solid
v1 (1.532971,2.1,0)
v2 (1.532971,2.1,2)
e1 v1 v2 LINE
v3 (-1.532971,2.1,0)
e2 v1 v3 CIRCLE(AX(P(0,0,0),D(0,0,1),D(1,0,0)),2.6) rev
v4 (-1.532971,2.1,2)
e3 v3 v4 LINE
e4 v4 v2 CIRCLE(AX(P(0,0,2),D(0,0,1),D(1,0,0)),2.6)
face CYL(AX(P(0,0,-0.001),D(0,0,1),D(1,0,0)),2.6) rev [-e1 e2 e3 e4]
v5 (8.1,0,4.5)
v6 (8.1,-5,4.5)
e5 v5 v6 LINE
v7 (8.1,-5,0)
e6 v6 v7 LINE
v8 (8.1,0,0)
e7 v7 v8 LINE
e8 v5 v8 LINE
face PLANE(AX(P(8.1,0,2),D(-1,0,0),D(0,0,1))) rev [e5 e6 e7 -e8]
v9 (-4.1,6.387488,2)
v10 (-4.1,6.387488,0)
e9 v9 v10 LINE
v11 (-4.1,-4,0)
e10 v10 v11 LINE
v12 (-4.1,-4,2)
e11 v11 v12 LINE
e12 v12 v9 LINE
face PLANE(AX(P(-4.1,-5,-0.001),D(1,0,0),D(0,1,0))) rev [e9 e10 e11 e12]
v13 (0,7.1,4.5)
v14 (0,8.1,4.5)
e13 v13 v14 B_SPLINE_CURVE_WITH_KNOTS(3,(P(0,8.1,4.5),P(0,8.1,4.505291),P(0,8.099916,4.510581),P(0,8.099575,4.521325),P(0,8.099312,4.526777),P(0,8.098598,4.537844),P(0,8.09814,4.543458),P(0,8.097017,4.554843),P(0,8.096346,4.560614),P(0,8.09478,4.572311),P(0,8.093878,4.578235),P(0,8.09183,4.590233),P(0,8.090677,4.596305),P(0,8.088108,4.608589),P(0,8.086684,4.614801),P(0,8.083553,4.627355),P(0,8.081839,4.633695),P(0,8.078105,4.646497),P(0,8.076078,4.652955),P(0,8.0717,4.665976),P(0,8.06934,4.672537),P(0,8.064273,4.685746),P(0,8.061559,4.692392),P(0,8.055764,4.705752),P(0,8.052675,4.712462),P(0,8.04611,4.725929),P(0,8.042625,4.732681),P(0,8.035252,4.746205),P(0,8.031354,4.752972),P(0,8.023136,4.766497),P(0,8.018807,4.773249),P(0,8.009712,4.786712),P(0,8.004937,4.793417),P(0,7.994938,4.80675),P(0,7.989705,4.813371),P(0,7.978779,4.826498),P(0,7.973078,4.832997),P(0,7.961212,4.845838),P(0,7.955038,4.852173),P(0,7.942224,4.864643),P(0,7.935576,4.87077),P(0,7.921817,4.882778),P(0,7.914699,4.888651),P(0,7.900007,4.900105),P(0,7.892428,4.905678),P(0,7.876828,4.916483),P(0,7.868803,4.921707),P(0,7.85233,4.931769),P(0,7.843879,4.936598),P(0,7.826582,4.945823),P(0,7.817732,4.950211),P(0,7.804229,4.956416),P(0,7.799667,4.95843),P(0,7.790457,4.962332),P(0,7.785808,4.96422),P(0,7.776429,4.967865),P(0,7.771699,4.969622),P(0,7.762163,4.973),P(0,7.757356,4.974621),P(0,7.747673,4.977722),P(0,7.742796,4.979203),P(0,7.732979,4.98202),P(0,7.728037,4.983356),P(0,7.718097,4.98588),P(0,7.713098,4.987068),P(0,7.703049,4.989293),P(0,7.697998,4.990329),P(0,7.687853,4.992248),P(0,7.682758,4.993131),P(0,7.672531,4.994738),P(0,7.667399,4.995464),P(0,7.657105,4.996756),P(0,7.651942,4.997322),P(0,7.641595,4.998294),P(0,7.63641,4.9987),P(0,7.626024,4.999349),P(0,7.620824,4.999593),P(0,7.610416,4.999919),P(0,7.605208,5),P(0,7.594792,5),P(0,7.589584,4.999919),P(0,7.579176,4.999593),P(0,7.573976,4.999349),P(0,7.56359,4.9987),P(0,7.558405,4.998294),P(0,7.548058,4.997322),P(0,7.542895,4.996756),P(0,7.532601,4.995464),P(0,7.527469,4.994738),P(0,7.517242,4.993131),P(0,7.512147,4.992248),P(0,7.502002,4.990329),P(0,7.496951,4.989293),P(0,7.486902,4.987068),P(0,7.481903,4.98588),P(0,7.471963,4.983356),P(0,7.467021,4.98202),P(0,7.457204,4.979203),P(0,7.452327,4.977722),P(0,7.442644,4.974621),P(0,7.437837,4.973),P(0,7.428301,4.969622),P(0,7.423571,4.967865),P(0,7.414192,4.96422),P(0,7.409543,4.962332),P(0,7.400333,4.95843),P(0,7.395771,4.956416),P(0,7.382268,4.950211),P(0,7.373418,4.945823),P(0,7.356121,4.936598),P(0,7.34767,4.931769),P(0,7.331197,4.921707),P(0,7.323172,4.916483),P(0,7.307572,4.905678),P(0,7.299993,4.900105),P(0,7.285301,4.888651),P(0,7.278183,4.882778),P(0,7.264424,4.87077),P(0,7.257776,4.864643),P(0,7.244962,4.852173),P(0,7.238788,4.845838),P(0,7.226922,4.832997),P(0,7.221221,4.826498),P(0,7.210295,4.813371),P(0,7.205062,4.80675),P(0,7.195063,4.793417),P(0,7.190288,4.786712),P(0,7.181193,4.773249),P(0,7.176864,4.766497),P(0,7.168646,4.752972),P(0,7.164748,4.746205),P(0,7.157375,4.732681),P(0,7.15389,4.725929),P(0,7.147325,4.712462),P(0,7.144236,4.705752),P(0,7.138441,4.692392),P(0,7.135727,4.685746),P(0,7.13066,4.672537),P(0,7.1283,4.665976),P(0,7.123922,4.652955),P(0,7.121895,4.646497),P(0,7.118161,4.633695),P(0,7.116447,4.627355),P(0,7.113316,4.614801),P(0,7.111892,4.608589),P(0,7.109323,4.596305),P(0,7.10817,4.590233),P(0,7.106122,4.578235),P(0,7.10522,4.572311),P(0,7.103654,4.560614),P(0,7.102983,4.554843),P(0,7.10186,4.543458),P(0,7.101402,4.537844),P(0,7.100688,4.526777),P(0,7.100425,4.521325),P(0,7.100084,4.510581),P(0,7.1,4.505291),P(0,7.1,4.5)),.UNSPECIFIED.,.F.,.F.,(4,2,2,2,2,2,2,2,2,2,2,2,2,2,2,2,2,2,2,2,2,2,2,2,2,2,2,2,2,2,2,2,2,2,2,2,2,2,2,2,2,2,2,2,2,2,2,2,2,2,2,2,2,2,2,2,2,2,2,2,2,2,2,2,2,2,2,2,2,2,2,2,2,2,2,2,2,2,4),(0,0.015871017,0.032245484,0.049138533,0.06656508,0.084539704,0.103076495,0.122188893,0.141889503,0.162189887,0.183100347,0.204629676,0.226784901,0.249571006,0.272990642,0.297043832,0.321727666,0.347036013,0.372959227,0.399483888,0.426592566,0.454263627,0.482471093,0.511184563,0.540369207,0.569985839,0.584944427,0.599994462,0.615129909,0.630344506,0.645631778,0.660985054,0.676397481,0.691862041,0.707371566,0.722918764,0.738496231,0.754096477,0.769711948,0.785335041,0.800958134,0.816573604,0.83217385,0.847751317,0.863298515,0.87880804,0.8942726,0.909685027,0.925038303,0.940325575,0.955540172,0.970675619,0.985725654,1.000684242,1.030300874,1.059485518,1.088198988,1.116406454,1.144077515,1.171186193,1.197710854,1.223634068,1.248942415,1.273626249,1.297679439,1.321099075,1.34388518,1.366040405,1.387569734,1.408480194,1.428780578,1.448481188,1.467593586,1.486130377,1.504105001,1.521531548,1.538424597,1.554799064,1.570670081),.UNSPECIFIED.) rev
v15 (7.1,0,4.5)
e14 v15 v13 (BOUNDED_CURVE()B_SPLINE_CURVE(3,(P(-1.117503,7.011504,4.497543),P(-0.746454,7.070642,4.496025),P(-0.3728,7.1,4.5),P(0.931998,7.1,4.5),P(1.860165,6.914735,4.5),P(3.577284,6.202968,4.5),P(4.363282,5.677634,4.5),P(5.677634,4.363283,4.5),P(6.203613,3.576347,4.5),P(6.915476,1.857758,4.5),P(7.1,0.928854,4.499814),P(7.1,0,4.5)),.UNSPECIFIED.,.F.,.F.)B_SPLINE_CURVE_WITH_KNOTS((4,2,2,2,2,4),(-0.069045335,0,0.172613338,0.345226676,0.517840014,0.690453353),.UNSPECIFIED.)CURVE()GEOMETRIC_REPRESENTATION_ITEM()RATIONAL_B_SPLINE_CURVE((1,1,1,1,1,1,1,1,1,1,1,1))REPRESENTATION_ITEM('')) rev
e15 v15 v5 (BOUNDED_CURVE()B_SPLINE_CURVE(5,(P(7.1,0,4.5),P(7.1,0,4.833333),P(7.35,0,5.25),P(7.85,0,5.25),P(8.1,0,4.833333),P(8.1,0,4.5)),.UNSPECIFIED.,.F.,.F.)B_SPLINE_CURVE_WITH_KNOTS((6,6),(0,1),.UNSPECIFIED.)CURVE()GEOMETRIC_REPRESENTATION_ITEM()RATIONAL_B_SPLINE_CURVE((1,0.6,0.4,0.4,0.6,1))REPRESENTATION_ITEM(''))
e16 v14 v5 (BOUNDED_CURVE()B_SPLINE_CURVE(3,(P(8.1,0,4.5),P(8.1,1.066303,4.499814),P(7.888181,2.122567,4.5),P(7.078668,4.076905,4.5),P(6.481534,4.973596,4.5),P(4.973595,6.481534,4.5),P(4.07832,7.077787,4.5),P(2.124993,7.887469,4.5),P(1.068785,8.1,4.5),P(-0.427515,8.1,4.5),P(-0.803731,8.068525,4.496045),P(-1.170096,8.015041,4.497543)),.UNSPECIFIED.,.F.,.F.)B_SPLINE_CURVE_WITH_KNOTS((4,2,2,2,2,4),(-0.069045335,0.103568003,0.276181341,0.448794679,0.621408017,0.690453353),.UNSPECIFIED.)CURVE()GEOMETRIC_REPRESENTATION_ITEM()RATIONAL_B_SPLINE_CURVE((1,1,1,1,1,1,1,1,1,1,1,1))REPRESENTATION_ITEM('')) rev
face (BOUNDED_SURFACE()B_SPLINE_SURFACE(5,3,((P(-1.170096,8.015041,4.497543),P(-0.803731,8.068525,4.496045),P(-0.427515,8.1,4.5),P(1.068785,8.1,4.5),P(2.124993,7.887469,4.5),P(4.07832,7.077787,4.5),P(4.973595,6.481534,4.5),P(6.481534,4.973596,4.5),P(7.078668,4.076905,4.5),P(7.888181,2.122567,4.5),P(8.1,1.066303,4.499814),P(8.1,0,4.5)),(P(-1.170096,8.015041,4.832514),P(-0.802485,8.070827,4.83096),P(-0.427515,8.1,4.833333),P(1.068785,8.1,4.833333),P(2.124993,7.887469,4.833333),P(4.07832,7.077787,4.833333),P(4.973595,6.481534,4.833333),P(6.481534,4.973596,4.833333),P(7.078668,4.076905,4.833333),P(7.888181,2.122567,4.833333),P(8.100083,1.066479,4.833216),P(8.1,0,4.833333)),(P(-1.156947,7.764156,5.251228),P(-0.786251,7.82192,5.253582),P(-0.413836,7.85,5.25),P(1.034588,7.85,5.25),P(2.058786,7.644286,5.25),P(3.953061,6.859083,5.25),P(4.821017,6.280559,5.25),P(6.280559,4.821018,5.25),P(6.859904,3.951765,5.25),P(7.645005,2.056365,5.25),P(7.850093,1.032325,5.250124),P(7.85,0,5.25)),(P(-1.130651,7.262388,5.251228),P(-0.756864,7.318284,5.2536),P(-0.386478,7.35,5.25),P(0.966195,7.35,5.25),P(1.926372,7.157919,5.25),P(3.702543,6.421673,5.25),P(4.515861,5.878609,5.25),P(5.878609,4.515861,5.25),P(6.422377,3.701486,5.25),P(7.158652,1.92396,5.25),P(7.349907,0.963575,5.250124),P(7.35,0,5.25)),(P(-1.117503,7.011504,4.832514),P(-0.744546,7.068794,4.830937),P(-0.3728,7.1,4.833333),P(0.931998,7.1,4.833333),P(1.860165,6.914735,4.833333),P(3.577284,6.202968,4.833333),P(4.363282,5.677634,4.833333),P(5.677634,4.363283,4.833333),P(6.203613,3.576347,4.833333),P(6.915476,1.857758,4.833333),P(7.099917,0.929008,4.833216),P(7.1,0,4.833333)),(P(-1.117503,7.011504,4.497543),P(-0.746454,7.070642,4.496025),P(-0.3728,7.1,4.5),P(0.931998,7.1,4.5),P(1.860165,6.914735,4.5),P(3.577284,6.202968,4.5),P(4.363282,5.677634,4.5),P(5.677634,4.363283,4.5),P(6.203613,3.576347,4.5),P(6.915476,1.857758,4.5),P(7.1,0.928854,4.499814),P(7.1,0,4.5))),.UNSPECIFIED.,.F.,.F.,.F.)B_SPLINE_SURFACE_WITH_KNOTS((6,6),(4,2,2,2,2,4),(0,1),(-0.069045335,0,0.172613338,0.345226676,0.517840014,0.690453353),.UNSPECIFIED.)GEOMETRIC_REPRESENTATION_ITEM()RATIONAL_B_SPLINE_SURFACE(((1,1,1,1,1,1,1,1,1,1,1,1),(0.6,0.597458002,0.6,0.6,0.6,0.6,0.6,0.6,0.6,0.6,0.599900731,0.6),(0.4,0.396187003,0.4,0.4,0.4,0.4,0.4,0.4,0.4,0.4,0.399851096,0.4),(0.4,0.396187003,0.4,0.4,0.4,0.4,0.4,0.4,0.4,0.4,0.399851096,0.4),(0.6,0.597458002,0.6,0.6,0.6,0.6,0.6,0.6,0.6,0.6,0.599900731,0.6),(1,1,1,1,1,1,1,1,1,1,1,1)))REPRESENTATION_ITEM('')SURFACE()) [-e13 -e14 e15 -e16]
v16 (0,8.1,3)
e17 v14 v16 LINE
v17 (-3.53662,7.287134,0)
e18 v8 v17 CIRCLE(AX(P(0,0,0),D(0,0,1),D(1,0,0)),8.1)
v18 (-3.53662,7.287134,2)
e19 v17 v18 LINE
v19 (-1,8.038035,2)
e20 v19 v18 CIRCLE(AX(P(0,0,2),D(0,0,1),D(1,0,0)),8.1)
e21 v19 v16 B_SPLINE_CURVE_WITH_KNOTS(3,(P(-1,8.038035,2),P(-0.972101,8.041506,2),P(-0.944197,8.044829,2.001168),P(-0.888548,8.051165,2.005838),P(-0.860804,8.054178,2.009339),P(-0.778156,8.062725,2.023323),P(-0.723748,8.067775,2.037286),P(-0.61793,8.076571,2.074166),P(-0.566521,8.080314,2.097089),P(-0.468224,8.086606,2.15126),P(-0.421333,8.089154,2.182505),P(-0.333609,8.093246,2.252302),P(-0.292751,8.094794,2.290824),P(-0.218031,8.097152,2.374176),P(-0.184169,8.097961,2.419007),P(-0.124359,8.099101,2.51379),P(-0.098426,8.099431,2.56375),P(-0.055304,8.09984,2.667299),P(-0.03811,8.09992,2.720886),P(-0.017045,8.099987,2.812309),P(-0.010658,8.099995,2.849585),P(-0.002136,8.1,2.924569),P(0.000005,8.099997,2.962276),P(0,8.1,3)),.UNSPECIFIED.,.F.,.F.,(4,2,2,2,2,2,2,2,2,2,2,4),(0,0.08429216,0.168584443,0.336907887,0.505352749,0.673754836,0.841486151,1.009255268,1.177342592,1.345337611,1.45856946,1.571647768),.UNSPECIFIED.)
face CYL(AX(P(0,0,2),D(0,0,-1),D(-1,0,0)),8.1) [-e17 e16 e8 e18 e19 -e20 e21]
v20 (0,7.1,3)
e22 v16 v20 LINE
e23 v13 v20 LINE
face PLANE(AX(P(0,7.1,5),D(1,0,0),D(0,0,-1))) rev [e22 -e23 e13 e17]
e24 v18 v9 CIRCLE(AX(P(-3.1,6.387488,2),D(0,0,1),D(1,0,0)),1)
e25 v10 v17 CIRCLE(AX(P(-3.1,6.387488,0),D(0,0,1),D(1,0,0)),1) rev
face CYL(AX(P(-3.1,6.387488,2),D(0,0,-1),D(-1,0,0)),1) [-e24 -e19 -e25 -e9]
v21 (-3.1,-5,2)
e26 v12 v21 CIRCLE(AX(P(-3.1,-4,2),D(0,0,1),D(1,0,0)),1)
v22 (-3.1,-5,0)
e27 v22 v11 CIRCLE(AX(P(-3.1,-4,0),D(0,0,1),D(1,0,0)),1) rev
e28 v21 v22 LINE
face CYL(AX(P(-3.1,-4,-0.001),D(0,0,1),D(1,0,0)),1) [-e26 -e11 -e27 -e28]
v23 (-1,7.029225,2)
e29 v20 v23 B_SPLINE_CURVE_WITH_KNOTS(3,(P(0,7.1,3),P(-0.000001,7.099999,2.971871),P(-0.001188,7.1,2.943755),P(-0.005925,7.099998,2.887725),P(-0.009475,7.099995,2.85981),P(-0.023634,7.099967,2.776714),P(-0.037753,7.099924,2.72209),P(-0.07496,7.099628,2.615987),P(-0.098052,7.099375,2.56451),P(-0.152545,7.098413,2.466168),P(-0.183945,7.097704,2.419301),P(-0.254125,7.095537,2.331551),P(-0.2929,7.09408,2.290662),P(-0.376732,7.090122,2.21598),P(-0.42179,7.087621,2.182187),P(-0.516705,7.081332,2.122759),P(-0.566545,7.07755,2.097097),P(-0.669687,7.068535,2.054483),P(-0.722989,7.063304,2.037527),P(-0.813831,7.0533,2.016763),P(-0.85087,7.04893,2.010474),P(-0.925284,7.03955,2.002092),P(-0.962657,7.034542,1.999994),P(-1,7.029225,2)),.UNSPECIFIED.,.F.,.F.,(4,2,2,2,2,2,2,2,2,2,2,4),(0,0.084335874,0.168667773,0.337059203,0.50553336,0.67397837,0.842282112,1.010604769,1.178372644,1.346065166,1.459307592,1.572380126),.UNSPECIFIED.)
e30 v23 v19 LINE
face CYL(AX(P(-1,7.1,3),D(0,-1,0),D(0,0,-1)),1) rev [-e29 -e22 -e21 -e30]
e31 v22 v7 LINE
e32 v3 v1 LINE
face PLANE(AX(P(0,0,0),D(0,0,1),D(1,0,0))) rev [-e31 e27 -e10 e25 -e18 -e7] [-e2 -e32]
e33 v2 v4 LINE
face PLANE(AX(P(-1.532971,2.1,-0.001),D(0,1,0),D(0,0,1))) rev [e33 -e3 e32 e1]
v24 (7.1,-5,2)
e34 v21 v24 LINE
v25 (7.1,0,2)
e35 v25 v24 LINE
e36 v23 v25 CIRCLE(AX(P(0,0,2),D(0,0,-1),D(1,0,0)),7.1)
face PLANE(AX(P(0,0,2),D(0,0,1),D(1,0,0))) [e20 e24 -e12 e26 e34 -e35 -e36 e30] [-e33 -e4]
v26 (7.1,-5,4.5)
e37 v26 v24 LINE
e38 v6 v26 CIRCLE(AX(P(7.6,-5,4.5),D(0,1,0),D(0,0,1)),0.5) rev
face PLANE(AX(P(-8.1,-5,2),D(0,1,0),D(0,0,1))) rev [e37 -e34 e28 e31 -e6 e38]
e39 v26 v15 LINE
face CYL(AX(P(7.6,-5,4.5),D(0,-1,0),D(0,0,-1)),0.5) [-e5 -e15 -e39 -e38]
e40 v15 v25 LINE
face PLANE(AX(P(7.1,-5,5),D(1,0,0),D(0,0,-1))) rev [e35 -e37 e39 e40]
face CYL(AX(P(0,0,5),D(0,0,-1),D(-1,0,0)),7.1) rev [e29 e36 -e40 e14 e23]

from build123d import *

# Parameters (mm, degrees)
SALIENTE_EXTRUIR1_DEPTH = 2
CORTAR_EXTRUIR1_REACH   = 13.628
CORTAR_EXTRUIR2_REACH   = 13.628
SALIENTE_EXTRUIR3_DEPTH = 3
REDONDEO3_R             = 0.5
REDONDEO4_R             = 1


with BuildPart() as part:
    # Croquis1 → Saliente-Extruir1 (new body)
    with BuildSketch(Plane.XY):
        with BuildLine():
            Line((8.1, 0), (8.1, -5))
            Line((8.1, -5), (-8.1, -5))
            Line((-8.1, -5), (-8.1, 0))
            ThreePointArc((-8.1, 0), (0, 8.1), (8.1, 0))
        make_face()
    extrude(amount=SALIENTE_EXTRUIR1_DEPTH)

    # Croquis4 → Cortar-Extruir1 (cut, up to next)
    with BuildSketch(Plane.XY.offset(2), mode=Mode.PRIVATE) as cortar_extruir1_sk1:
        with BuildLine():
            Line((-1.532970972, 2.1), (1.532970972, 2.1))
            ThreePointArc((1.532970972, 2.1), (0, -2.6), (-1.532970972, 2.1))
        make_face()
    cortar_extruir1_tool1 = extrude(cortar_extruir1_sk1.sketch, amount=-CORTAR_EXTRUIR1_REACH, mode=Mode.PRIVATE) & part.part
    add(cortar_extruir1_tool1.solids().sort_by_distance((0, -0.118931, 2))[0], mode=Mode.SUBTRACT)

    # Croquis5 → Cortar-Extruir2 (cut, up to next)
    with BuildSketch(Plane.XY.offset(2), mode=Mode.PRIVATE) as cortar_extruir2_sk1:
        with BuildLine():
            Line((-4.1, -5), (-4.1, 6.985699679))
            ThreePointArc((-4.1, 6.985699679), (-7.029224708, 4.024922359), (-8.1, 0))
            Line((-8.1, 0), (-8.1, -5))
            Line((-8.1, -5), (-4.1, -5))
        make_face()
    cortar_extruir2_tool1 = extrude(cortar_extruir2_sk1.sketch, amount=-CORTAR_EXTRUIR2_REACH, mode=Mode.PRIVATE) & part.part
    add(cortar_extruir2_tool1.solids().sort_by_distance((-5.920703, 0.103857, 2))[0], mode=Mode.SUBTRACT)

    # Croquis7 → Saliente-Extruir3 (add)
    with BuildSketch(Plane.XY.offset(2)):
        with BuildLine():
            Line((8.1, 0), (8.1, -5))
            Line((8.1, -5), (7.1, -5))
            Line((7.1, -5), (7.1, 0))
            ThreePointArc((7.1, 0), (5.020457997, 5.020458296), (-4.23e-07, 7.1))
            Line((-4.23e-07, 7.1), (-4.23e-07, 8.1))
            ThreePointArc((-4.23e-07, 8.1), (5.727564778, 5.727565077), (8.1, 0))
        make_face()
    extrude(amount=SALIENTE_EXTRUIR3_DEPTH)

    # Redondeo3
    redondeo3_edges = [part.edges().sort_by_distance(p)[0] for p in [
        (5.727564778, 5.727565077, 5),
        (5.020457997, 5.020458296, 5),
        (7.1, -2.5, 5),
        (8.1, -2.5, 5),
    ]]
    fillet(redondeo3_edges, radius=REDONDEO3_R - 0.0001)  # a hair under: the kernel refuses the full size

    # Redondeo4
    redondeo4_edges = [part.edges().sort_by_distance(p)[0] for p in [
        (-4.1, -5, 1),
        (-4.1, 6.985699679, 1),
        (-4.23e-07, 7.6, 2),
    ]]
    fillet(redondeo4_edges, radius=REDONDEO4_R)


solid = part.part
